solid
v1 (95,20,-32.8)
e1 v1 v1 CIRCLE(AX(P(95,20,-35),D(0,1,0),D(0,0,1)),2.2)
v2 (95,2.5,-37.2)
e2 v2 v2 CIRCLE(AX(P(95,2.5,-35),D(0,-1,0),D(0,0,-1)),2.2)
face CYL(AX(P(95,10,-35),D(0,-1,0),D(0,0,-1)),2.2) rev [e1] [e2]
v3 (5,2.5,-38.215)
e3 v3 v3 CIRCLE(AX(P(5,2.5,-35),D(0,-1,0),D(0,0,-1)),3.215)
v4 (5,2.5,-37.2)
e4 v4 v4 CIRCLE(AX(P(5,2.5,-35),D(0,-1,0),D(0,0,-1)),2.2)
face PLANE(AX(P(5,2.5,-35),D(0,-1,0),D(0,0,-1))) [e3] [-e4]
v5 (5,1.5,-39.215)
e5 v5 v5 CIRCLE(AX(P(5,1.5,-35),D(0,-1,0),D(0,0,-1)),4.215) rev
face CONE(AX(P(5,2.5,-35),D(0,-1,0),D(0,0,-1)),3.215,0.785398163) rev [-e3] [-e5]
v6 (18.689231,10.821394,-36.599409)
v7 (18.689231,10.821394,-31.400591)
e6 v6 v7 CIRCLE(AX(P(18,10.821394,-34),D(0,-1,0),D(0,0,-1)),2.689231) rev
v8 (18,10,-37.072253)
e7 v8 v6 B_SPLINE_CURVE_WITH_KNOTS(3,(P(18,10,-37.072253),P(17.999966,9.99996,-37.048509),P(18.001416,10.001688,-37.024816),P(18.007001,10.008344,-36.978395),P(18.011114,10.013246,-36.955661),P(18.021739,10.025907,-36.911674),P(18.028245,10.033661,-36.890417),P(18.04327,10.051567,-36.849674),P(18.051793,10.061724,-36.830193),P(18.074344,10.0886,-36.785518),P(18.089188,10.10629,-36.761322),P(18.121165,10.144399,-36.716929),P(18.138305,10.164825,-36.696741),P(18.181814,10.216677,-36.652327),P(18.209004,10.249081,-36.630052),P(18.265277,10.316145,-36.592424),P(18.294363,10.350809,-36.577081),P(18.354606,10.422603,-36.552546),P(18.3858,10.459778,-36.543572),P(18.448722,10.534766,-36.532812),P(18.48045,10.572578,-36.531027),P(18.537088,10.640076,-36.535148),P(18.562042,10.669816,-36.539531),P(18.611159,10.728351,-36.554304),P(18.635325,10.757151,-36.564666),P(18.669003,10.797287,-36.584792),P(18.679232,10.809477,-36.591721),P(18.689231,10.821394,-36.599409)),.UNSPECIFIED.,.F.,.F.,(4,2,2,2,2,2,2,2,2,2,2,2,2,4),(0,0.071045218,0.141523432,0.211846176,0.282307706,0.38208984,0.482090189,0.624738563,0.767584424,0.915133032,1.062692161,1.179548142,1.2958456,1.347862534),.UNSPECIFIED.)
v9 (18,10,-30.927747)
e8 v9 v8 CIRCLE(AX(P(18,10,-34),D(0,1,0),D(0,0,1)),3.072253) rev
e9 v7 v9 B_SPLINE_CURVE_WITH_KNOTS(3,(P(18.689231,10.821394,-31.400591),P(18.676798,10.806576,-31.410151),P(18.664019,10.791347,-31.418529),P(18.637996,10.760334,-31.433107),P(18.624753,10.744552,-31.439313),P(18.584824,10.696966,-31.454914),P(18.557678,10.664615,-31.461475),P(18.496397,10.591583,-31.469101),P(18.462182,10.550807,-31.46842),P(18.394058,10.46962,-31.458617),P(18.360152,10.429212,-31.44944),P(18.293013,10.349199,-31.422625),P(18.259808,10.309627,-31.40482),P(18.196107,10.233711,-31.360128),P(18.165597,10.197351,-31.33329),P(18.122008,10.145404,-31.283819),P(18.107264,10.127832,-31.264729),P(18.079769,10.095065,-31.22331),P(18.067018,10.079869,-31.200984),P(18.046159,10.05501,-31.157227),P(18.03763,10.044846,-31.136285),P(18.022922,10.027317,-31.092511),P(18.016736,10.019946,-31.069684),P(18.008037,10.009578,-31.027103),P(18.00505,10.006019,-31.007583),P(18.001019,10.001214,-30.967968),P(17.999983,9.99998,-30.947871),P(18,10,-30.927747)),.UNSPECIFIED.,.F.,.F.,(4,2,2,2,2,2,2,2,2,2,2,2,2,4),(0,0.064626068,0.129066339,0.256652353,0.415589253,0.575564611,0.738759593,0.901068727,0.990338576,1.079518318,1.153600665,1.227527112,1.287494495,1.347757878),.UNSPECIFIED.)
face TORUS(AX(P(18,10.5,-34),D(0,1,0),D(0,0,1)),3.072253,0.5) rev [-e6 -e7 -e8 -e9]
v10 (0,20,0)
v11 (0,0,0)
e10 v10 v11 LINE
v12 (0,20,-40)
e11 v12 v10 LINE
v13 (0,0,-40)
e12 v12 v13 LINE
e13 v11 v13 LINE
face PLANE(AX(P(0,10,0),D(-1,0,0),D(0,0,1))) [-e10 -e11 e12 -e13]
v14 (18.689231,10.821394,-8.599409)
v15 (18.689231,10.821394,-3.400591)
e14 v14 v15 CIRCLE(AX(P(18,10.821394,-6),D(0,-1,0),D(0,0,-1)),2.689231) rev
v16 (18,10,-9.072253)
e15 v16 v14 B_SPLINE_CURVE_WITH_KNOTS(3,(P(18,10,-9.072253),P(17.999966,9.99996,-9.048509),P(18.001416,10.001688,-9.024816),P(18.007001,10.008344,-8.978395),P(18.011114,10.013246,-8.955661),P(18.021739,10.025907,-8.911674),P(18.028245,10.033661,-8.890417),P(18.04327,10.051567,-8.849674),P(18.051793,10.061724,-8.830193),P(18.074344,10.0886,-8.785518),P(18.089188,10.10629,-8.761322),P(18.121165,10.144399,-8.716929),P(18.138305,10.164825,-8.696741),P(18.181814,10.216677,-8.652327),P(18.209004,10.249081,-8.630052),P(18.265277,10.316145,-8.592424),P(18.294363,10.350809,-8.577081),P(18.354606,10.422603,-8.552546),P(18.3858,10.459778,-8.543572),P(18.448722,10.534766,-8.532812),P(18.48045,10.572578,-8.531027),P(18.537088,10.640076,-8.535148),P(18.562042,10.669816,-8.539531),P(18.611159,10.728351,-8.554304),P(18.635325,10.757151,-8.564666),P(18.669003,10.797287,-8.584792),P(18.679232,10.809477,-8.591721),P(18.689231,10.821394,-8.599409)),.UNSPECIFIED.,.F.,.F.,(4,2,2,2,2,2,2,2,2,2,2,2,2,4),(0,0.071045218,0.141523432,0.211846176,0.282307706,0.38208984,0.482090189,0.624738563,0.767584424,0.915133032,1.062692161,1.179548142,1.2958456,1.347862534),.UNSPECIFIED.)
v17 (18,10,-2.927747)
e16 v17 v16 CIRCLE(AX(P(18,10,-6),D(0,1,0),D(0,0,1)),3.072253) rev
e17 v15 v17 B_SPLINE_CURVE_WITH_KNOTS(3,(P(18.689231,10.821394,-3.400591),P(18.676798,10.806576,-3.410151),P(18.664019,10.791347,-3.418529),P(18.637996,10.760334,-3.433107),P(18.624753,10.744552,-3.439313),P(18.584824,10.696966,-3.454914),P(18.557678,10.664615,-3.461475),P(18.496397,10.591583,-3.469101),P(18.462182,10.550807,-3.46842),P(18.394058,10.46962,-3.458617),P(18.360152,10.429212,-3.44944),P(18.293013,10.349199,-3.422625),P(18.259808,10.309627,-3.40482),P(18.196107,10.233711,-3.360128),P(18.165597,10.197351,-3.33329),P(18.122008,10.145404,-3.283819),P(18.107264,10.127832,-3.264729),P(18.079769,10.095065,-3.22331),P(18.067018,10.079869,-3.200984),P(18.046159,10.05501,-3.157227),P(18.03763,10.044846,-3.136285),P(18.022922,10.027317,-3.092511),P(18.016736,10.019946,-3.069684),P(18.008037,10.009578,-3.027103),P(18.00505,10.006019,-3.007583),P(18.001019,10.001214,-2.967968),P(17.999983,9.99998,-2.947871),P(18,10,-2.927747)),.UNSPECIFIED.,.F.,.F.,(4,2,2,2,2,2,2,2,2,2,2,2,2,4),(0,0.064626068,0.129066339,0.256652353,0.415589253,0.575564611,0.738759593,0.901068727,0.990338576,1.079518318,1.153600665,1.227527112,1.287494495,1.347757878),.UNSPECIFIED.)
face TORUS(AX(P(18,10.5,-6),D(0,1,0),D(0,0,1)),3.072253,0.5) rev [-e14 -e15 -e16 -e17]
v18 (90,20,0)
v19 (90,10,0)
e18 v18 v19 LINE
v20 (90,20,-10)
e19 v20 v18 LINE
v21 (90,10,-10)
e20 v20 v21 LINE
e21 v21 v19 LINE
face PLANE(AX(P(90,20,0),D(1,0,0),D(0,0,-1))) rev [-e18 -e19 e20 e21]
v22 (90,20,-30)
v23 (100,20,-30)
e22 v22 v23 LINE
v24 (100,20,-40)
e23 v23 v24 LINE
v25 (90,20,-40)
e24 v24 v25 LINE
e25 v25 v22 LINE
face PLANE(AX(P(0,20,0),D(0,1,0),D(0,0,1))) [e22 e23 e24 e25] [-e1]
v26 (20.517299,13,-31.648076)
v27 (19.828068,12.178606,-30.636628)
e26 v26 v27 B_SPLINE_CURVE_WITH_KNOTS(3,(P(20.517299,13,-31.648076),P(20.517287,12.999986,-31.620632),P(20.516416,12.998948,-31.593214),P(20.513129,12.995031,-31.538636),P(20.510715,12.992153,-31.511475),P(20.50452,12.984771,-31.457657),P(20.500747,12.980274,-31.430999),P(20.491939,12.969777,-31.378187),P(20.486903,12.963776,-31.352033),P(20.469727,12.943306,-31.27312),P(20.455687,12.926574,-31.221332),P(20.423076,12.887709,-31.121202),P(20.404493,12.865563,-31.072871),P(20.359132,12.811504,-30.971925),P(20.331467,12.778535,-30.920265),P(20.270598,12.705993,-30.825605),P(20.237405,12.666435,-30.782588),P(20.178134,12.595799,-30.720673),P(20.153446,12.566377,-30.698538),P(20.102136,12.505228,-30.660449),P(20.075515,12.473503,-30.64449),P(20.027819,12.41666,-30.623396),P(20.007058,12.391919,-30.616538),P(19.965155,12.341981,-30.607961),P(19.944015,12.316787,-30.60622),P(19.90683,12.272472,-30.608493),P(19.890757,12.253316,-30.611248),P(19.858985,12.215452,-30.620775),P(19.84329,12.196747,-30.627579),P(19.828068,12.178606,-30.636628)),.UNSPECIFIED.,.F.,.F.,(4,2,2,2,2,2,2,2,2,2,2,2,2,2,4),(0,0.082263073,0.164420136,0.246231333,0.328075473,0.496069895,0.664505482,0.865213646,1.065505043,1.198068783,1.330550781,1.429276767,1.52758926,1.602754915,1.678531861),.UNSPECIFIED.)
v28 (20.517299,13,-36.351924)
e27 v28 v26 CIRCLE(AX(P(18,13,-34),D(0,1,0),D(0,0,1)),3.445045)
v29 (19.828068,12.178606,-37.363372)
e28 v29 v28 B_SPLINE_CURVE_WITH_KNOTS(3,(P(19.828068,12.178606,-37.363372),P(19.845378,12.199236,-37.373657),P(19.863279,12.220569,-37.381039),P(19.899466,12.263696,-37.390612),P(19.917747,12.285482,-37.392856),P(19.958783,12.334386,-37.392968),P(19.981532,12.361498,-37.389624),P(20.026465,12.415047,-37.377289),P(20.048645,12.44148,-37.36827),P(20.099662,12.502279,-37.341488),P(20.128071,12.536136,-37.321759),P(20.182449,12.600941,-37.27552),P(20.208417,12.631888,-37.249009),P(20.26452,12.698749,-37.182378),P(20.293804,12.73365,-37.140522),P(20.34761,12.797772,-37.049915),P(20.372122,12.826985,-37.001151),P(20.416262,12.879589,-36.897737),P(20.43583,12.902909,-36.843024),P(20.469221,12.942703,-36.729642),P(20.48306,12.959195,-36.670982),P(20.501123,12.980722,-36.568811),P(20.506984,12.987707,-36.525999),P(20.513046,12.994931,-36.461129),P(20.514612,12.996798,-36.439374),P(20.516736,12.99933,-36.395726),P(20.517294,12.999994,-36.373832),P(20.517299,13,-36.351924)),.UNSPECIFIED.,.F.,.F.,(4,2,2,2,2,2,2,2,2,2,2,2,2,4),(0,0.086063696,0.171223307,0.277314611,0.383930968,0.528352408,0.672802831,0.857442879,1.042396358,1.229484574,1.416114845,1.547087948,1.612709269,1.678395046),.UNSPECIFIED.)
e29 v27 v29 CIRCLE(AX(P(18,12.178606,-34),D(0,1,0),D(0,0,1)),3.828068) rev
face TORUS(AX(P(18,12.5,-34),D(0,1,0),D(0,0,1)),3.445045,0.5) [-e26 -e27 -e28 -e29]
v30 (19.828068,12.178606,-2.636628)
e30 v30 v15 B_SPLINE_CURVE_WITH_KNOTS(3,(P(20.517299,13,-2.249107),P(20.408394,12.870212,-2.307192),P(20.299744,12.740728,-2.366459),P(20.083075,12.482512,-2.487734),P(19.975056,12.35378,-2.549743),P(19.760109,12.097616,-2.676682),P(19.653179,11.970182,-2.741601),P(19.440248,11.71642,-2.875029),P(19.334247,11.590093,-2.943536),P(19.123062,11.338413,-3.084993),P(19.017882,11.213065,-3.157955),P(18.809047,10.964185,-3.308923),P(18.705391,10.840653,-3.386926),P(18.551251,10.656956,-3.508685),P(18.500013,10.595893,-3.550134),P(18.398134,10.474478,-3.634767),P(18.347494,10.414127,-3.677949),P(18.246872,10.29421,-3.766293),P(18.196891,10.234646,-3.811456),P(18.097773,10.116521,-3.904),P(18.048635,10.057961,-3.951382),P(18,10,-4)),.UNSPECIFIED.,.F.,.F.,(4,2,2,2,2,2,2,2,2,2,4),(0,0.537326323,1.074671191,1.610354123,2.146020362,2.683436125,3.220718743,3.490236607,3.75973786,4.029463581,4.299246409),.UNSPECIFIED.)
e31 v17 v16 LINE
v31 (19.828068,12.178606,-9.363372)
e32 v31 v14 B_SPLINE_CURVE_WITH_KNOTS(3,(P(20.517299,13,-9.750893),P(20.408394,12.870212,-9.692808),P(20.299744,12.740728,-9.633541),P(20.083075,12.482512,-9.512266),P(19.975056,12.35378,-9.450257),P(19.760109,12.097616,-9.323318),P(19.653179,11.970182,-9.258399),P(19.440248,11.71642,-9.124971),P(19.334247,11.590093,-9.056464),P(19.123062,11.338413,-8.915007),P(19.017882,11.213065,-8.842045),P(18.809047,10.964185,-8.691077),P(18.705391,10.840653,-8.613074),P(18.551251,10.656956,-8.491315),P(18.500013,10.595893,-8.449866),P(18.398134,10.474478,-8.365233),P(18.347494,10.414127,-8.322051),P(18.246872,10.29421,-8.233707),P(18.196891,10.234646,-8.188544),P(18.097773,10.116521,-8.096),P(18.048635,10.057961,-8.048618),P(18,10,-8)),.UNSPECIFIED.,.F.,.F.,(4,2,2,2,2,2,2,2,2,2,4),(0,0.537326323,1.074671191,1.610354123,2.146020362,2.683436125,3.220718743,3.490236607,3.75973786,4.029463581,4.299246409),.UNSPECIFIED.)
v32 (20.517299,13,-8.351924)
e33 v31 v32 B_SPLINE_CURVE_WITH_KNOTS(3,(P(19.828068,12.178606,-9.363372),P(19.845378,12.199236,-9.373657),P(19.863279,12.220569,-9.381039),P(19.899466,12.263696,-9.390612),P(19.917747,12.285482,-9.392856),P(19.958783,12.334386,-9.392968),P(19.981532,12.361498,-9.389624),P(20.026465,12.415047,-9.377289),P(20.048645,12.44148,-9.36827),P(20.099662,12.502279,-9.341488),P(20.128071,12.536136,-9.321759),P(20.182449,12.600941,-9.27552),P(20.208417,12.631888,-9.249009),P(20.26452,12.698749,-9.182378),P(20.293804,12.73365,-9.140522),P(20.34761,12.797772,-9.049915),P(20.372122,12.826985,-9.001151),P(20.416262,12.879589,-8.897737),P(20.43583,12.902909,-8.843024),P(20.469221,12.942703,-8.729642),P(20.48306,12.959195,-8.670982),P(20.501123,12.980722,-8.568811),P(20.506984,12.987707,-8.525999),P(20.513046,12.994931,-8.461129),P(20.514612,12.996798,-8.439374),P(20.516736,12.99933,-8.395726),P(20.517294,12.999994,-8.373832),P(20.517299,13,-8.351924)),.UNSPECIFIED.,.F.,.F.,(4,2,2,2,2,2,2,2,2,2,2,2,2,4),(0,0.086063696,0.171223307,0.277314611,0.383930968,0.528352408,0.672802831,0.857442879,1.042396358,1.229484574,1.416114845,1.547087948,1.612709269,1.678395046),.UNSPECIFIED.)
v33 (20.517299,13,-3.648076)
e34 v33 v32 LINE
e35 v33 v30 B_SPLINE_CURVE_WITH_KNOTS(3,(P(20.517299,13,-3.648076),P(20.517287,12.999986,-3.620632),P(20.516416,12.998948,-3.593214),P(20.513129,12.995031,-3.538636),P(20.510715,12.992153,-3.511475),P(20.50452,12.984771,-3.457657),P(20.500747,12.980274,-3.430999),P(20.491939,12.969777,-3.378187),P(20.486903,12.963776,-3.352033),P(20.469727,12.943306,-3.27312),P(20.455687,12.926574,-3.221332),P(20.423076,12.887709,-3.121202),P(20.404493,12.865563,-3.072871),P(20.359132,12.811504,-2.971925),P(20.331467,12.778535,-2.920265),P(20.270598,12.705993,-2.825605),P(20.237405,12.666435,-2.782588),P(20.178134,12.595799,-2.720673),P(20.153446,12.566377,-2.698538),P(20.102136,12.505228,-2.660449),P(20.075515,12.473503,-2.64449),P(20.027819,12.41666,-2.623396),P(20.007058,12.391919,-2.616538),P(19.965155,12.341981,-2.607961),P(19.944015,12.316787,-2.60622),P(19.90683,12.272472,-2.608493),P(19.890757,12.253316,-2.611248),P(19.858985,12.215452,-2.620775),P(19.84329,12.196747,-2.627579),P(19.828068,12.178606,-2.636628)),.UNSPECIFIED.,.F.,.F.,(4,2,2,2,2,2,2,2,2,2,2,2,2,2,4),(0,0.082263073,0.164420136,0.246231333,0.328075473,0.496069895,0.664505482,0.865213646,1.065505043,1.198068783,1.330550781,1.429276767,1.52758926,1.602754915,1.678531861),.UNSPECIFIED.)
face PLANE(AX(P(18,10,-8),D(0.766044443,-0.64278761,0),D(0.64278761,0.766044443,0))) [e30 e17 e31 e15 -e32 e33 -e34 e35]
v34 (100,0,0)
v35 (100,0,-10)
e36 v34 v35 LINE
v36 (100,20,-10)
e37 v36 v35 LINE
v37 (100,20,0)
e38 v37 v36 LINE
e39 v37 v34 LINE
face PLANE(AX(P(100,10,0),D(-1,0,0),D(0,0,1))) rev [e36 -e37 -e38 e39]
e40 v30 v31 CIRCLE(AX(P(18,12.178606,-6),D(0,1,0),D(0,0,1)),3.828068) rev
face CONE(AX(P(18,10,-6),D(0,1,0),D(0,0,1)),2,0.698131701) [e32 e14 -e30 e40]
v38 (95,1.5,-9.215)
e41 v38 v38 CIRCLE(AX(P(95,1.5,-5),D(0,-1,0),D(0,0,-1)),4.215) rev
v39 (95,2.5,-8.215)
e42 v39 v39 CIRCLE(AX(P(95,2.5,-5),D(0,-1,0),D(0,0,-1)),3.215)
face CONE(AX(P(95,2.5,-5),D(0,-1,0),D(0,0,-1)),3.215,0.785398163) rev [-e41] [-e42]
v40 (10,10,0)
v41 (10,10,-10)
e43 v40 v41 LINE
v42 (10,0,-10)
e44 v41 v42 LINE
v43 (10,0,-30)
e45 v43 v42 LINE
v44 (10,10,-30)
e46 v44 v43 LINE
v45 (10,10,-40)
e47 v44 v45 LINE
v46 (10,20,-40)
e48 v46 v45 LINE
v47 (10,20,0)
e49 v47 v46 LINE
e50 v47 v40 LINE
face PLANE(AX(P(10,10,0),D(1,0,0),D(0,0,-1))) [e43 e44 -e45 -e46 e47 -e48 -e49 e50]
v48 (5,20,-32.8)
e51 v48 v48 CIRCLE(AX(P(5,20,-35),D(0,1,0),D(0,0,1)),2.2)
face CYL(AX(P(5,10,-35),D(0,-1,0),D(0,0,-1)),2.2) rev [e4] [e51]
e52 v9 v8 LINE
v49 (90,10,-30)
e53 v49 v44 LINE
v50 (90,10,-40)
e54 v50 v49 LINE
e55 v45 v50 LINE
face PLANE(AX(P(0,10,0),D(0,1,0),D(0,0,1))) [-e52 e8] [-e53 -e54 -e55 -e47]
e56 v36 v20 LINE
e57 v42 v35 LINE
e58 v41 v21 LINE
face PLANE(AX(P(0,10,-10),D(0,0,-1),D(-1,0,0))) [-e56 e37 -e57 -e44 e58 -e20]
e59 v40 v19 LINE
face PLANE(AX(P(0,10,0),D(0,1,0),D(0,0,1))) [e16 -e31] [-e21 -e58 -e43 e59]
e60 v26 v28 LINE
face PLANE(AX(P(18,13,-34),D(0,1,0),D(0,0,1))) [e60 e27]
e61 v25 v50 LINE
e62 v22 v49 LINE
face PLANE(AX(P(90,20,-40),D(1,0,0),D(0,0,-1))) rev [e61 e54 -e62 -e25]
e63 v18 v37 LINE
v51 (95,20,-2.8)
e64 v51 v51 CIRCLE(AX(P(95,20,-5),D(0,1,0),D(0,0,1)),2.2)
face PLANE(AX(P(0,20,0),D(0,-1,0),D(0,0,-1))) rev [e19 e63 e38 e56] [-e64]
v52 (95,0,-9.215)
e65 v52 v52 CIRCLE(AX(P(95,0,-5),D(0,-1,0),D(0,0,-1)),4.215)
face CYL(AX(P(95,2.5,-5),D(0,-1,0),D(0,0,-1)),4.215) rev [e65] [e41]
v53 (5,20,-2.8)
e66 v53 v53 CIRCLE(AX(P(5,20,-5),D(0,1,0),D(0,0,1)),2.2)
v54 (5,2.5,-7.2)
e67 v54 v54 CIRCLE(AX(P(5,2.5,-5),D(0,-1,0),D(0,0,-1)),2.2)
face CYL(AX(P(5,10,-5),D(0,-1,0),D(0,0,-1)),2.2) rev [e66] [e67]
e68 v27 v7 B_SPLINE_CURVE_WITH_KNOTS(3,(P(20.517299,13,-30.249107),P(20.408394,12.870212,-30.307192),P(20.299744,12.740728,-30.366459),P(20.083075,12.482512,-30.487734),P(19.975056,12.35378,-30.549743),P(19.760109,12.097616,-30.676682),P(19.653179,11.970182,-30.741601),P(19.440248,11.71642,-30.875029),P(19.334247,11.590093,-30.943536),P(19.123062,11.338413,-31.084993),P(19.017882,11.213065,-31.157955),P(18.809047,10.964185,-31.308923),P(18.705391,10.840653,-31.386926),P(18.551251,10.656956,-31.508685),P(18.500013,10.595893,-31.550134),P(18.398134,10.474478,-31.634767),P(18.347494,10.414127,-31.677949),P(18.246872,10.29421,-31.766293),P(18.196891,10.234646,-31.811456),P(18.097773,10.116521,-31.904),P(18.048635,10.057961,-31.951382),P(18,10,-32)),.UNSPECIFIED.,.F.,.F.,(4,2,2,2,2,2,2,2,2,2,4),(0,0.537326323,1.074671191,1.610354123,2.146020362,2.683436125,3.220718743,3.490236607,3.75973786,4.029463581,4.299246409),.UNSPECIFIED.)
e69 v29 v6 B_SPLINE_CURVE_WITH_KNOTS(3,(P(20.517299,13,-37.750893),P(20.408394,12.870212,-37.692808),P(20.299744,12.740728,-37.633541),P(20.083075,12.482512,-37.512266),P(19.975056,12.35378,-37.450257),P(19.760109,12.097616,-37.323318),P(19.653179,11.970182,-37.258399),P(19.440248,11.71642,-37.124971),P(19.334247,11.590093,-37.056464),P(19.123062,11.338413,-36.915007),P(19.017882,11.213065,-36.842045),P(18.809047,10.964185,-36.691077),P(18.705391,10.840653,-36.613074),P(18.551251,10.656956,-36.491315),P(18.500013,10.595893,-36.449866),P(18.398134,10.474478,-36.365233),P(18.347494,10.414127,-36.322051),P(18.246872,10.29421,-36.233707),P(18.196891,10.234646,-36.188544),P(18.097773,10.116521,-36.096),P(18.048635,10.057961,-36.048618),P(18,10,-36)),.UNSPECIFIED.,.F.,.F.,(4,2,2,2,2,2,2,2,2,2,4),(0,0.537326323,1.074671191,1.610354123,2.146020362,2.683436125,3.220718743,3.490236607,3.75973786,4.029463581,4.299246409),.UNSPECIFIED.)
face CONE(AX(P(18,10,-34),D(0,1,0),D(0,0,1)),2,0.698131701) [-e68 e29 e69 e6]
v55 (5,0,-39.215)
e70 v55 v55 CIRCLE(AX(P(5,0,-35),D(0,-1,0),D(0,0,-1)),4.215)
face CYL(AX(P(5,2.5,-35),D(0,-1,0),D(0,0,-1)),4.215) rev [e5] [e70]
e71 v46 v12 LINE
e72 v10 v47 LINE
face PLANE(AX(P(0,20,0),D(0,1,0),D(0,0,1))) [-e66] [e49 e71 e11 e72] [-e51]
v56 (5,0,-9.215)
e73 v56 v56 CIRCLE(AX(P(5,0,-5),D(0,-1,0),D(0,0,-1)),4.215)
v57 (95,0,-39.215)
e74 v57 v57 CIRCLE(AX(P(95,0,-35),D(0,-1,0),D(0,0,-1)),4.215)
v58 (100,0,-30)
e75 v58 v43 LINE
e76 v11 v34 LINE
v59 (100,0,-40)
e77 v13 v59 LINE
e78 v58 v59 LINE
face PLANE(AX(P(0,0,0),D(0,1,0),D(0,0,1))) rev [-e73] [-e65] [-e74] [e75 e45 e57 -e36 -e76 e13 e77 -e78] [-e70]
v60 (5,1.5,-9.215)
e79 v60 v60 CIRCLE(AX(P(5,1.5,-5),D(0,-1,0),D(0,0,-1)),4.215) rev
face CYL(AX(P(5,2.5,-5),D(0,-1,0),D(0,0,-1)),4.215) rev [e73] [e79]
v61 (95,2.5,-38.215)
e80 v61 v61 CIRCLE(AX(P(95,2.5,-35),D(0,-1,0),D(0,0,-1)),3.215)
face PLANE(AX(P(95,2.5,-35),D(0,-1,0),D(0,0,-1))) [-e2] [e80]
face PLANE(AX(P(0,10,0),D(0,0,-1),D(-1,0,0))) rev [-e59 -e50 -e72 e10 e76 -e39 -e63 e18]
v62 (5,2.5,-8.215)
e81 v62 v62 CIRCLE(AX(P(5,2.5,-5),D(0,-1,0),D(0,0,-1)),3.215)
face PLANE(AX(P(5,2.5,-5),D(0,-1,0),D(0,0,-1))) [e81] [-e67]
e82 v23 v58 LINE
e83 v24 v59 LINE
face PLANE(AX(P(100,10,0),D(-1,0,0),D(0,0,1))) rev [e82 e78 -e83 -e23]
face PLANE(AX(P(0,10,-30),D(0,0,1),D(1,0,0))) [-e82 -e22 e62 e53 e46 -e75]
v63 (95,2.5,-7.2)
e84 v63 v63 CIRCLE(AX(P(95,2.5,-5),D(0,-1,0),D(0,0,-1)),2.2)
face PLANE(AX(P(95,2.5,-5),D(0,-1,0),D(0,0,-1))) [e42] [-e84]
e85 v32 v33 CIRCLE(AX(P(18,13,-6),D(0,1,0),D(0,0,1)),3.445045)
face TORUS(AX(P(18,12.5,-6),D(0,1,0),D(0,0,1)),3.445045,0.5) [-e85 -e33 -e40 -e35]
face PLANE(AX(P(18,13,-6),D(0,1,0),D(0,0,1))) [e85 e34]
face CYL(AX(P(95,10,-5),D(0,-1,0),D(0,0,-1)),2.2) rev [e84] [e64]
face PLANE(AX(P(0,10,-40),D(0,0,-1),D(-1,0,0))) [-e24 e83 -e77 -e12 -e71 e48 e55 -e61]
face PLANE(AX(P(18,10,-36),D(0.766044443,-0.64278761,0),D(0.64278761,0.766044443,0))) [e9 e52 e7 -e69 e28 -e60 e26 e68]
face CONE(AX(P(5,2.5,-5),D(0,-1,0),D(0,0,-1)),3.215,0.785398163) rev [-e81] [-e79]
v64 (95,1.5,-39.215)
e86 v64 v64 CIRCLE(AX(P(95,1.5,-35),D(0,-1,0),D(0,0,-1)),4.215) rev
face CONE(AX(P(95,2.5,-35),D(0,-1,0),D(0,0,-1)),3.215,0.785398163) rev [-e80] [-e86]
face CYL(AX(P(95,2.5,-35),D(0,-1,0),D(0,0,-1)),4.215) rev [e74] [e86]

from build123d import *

# Parameters (mm, degrees)
SKETCH1_R             = 2.2
BOSS_EXTRUDE1_DEPTH   = 10
SKETCH5_W             = 10
SKETCH5_H             = 40
SKETCH5_R             = 2.2
SKETCH5_H_2           = 10
BOSS_EXTRUDE3_DEPTH   = 10
SKETCH6_R             = 4.215
CUT_EXTRUDE1_DEPTH    = 2.5
CHAMFER2_SIZE         = 1
BOSS_EXTRUDE4_DEPTH   = 3
BOSS_EXTRUDE4_DRAFT   = -40
BOSS_EXTRUDE4_2_DEPTH = 3
BOSS_EXTRUDE4_2_DRAFT = -40
FILLET1_R             = 0.5


# Read off the part's stored shape, not the designer's step: Boss-Extrude4
with BuildPart() as part:
    # Sketch1 → Boss-Extrude1 (new body)
    with BuildSketch(Plane(origin=(0, 0, 0), x_dir=(1, 0, 0), z_dir=(0, 1, 0))):
        Polygon((10, 10), (10, 30), (90, 30), (100, 30), (100, 40), (0, 40), (0, 0), (100, 0), (100, 10), (90, 10), align=None)
        with Locations(Location((5, 5, 0), (0, 0, 270))):
            Circle(SKETCH1_R, mode=Mode.SUBTRACT)
        with Locations(Location((95, 5, 0), (0, 0, 270))):
            Circle(SKETCH1_R, mode=Mode.SUBTRACT)
        with Locations(Location((5, 35, 0), (0, 0, 270))):
            Circle(SKETCH1_R, mode=Mode.SUBTRACT)
        with Locations(Location((95, 35, 0), (0, 0, 270))):
            Circle(SKETCH1_R, mode=Mode.SUBTRACT)
    extrude(amount=BOSS_EXTRUDE1_DEPTH)

    # Sketch5 → Boss-Extrude3 (add)
    # profile 1 of 3: a face of its own
    with BuildSketch(Plane(origin=(0, 10, 0), x_dir=(1, 0, 0), z_dir=(0, 1, 0))):
        with Locations((5, 20)):
            Rectangle(SKETCH5_W, SKETCH5_H)
        with Locations(Location((5, 5, 0), (0, 0, 270))):
            Circle(SKETCH5_R, mode=Mode.SUBTRACT)
        with Locations(Location((5, 35, 0), (0, 0, 270))):
            Circle(SKETCH5_R, mode=Mode.SUBTRACT)
    # profile 2 of 3: a face of its own
    with BuildSketch(Plane(origin=(0, 10, 0), x_dir=(1, 0, 0), z_dir=(0, 1, 0))):
        with Locations((95, 5)):
            Rectangle(SKETCH5_W, SKETCH5_H_2)
        with Locations(Location((95, 5, 0), (0, 0, 270))):
            Circle(SKETCH5_R, mode=Mode.SUBTRACT)
    # profile 3 of 3: a face of its own
    with BuildSketch(Plane(origin=(0, 10, 0), x_dir=(1, 0, 0), z_dir=(0, 1, 0))):
        with Locations((95, 35)):
            Rectangle(SKETCH5_W, SKETCH5_H_2)
        with Locations(Location((95, 35, 0), (0, 0, 270))):
            Circle(SKETCH5_R, mode=Mode.SUBTRACT)
    extrude(amount=BOSS_EXTRUDE3_DEPTH)

    # Sketch6 → Cut-Extrude1 (cut)
    with BuildSketch(Plane.XZ):
        with Locations(Location((5, -35, 0), (0, 0, 270))):
            Circle(SKETCH6_R)
        with Locations(Location((5, -5, 0), (0, 0, 270))):
            Circle(SKETCH6_R)
        with Locations(Location((95, -5, 0), (0, 0, 270))):
            Circle(SKETCH6_R)
        with Locations(Location((95, -35, 0), (0, 0, 270))):
            Circle(SKETCH6_R)
    extrude(amount=-CUT_EXTRUDE1_DEPTH, mode=Mode.SUBTRACT)

    # Chamfer2
    chamfer2_edges = [part.edges().sort_by_distance(p)[0] for p in [
        (95, 2.5, -30.785),
        (95, 2.5, -0.785),
        (5, 2.5, -0.785),
        (5, 2.5, -30.785),
    ]]
    chamfer(chamfer2_edges, length=CHAMFER2_SIZE)


with BuildPart() as boss_extrude4_tool:
    # Boss-Extrude4 outline → Boss-Extrude4 (with draft: the straight prism first)
    with BuildSketch(Plane(origin=(0, 13, 0), x_dir=(1, 0, 0), z_dir=(0, 1, 0))):
        with BuildLine():
            ThreePointArc((20.517298894, 9.750892637), (13.482701106, 6), (20.517298894, 2.249107363))
            Line((20.517298894, 2.249107363), (20.517298894, 9.750892637))
        make_face()
    extrude(amount=-BOSS_EXTRUDE4_DEPTH)
    # Boss-Extrude4: the draft: its side faces are tilted about the plane it starts from
    boss_extrude4_sides = [boss_extrude4_tool.faces().sort_by_distance(p)[0] for p in [
        (20.517298894, 11.5, -6),
        (13.482701106, 11.5, -6),
    ]]
    draft(boss_extrude4_sides, Plane(origin=(0, 13, 0), x_dir=(1, 0, 0), z_dir=(0, 1, 0)), BOSS_EXTRUDE4_DRAFT)


with BuildPart() as part_1:
    add(part.part)

    # Boss-Extrude4: add boss_extrude4_tool
    add(boss_extrude4_tool.part)


with BuildPart() as boss_extrude4_2_tool:
    # Boss-Extrude4 2 outline → Boss-Extrude4 2 (with draft: the straight prism first)
    with BuildSketch(Plane(origin=(0, 13, 0), x_dir=(1, 0, 0), z_dir=(0, 1, 0))):
        with BuildLine():
            ThreePointArc((20.517298894, 37.750892637), (13.482701106, 34), (20.517298894, 30.249107363))
            Line((20.517298894, 30.249107363), (20.517298894, 37.750892637))
        make_face()
    extrude(amount=-BOSS_EXTRUDE4_2_DEPTH)
    # Boss-Extrude4 2: the draft: its side faces are tilted about the plane it starts from
    boss_extrude4_2_sides = [boss_extrude4_2_tool.faces().sort_by_distance(p)[0] for p in [
        (13.482701106, 11.5, -34),
        (20.517298894, 11.5, -34),
    ]]
    draft(boss_extrude4_2_sides, Plane(origin=(0, 13, 0), x_dir=(1, 0, 0), z_dir=(0, 1, 0)), BOSS_EXTRUDE4_2_DRAFT)


with BuildPart() as part_2:
    add(part_1.part)

    # Boss-Extrude4 2: add boss_extrude4_2_tool
    add(boss_extrude4_2_tool.part)

    # Fillet1
    fillet1_edges = [part_2.edges().sort_by_distance(p)[0] for p in [
        (13.482701106, 13, -34),
        (16, 10, -34),
        (13.482701106, 13, -6),
        (16, 10, -6),
    ]]
    fillet(fillet1_edges, radius=FILLET1_R)


solid = part_2.part
